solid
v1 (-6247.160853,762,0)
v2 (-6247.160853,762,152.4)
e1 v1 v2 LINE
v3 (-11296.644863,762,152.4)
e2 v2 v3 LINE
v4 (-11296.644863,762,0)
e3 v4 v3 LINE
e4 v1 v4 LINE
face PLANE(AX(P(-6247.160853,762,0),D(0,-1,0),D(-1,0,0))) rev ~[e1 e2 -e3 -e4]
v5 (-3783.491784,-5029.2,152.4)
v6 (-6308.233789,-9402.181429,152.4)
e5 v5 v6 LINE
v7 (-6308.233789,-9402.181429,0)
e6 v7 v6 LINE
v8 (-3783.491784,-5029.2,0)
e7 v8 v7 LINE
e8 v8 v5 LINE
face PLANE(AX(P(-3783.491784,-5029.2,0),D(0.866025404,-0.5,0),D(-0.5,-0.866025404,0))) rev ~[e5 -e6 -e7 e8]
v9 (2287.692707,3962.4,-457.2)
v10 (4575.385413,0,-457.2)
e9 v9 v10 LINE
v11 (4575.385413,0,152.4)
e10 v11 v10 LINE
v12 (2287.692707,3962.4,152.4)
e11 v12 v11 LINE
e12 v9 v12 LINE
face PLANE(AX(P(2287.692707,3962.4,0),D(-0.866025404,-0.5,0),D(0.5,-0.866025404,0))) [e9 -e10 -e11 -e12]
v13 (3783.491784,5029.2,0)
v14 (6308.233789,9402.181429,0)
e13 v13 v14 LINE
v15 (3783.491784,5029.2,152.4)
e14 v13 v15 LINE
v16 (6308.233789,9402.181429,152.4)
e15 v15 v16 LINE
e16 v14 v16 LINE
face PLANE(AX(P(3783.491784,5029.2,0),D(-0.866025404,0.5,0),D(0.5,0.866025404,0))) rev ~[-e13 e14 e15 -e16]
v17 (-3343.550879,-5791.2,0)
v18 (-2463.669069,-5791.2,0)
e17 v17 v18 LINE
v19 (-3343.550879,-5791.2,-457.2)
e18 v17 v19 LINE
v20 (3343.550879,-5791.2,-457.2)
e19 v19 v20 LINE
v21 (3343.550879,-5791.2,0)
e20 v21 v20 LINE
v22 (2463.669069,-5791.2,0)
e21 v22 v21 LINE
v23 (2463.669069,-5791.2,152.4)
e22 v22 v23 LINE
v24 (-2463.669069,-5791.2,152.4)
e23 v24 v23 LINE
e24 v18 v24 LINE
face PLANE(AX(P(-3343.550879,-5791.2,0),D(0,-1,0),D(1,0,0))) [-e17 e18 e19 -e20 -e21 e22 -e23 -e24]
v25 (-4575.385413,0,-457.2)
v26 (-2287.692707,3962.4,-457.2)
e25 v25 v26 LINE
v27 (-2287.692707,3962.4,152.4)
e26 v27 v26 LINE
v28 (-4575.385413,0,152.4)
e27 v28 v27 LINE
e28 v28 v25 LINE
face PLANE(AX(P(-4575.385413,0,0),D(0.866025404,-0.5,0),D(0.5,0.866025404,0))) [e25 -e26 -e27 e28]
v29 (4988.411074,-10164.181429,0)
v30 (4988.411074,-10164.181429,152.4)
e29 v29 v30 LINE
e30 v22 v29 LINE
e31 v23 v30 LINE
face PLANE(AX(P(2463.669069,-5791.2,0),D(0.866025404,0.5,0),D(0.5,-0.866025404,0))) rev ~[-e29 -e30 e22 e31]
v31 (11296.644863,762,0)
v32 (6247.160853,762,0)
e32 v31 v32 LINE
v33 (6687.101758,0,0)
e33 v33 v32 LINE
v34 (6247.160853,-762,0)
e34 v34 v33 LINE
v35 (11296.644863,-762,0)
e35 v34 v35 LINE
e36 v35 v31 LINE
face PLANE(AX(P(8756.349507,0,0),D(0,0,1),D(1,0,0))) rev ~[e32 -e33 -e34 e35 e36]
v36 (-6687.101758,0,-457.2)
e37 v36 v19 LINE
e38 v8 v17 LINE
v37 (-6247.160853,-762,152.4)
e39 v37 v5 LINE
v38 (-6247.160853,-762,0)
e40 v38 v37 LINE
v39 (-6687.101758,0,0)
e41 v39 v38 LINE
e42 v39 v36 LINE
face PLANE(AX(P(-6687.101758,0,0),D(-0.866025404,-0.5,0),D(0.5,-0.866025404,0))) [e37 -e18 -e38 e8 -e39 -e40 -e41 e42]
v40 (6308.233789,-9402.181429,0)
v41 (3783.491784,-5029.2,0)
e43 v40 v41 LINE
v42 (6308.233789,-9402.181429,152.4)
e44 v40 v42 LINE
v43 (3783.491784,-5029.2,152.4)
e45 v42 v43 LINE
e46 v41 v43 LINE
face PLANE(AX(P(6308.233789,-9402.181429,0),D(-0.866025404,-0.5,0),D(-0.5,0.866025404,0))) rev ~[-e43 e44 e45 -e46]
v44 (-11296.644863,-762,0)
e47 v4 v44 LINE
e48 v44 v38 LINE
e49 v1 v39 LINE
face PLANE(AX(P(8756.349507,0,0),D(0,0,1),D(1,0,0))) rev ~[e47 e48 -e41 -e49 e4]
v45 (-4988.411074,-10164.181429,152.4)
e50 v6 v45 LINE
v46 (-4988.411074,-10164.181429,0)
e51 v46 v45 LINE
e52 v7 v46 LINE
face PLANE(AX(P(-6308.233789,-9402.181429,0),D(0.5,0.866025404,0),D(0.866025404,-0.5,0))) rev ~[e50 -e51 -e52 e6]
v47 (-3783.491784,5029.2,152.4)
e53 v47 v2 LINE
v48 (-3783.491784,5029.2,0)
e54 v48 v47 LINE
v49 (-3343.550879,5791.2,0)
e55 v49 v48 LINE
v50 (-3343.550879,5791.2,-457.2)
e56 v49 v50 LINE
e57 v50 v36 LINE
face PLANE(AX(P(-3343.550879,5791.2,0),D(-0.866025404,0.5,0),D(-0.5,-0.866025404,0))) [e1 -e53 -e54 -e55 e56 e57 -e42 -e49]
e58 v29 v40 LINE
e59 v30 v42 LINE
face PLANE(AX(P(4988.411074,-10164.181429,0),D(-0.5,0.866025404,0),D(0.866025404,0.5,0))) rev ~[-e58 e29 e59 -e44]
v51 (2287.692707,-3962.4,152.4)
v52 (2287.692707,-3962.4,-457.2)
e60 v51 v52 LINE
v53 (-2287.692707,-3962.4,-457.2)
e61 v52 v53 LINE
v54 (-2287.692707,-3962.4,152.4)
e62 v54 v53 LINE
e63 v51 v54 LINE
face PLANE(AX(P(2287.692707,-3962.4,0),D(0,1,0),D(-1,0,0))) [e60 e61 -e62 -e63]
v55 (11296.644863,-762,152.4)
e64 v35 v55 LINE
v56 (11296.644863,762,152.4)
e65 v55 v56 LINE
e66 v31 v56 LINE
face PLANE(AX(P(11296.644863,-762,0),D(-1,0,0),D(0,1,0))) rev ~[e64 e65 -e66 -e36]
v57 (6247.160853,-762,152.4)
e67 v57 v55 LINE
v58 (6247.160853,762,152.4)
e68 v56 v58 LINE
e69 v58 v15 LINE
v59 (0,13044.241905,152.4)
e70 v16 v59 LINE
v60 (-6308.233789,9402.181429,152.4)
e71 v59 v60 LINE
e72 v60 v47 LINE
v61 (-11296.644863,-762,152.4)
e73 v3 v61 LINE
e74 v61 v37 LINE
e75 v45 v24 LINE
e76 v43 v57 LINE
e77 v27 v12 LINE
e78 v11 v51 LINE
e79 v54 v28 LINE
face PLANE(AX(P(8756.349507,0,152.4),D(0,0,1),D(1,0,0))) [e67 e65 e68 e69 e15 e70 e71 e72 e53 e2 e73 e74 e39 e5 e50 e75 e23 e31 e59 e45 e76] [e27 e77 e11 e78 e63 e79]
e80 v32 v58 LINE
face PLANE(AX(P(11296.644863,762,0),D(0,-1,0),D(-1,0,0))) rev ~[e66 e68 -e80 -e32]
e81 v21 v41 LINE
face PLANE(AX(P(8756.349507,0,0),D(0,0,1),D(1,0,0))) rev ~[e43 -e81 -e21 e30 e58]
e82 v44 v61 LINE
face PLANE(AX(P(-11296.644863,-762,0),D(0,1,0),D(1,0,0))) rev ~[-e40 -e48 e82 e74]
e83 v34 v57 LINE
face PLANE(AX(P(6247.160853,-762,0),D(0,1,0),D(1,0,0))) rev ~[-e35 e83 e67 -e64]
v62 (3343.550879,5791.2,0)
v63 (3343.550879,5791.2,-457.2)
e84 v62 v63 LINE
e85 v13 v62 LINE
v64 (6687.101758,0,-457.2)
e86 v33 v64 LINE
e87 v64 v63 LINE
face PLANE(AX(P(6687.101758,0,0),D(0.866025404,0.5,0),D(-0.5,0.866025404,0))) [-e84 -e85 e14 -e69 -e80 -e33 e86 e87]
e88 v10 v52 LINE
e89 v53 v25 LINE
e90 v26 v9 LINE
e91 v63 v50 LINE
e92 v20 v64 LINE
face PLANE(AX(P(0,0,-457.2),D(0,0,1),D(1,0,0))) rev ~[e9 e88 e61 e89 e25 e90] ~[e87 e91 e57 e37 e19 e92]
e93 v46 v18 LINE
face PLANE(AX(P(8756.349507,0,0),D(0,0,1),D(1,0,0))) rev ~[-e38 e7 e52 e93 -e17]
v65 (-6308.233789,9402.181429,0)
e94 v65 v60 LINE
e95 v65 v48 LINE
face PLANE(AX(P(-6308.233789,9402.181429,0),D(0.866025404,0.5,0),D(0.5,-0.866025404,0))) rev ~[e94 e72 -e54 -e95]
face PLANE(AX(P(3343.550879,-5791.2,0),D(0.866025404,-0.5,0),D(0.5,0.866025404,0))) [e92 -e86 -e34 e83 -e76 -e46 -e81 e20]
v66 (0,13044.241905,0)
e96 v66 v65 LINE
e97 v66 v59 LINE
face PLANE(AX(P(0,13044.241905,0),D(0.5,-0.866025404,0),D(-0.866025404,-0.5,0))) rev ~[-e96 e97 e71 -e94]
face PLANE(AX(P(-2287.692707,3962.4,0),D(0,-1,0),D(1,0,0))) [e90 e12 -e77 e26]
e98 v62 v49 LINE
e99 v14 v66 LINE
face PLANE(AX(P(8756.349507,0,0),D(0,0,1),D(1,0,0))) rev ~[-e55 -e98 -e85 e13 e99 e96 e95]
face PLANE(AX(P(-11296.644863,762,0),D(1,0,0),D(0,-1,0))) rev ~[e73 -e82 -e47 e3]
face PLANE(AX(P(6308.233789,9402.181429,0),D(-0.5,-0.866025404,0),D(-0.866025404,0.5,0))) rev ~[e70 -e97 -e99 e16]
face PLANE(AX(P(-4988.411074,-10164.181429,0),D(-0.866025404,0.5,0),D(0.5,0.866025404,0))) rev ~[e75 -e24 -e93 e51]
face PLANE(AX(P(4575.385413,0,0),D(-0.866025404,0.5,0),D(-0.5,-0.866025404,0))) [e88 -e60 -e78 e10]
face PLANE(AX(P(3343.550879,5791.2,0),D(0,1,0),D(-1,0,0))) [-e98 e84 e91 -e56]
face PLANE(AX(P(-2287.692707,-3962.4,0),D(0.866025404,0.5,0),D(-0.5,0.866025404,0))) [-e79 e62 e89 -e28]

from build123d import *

# Parameters (mm, degrees)
F1_DEPTH = 152.4
F2_DEPTH = 457.2


# Not quite as in the source:
# - the program builds the solid bodies; features that only make, move or delete a surface that nothing else refers to are left out


with BuildPart() as f1:
    # F0 (on Top) → F1 (new body)
    with BuildSketch(Plane.XY):
        Polygon((6247.1608527394, 762), (6687.1017578619, 0), (6247.1608527394, -762), (11296.6448630235, -762), (11296.6448630235, 762), align=None)
        Polygon((6247.1608527394, -762), (6687.1017578619, 0), (6247.1608527394, 762), (3783.4917840535, 5029.2), (3343.550878931, 5791.2), (2463.669068686, 5791.2), (-2463.669068686, 5791.2), (-3343.550878931, 5791.2), (-3783.4917840535, 5029.2), (-6247.1608527394, 762), (-6687.1017578619, 0), (-6247.1608527394, -762), (-3783.4917840535, -5029.2), (-3343.550878931, -5791.2), (-2463.669068686, -5791.2), (2463.669068686, -5791.2), (3343.550878931, -5791.2), (3783.4917840535, -5029.2), align=None)
        Polygon((2287.692706637, 3962.4), (4575.3854132739, 0), (2287.692706637, -3962.4), (-2287.692706637, -3962.4), (-4575.3854132739, 0), (-2287.692706637, 3962.4), align=None, mode=Mode.SUBTRACT)
        Polygon((6308.2337891955, -9402.1814289093), (3783.4917840535, -5029.2), (3343.550878931, -5791.2), (2463.669068686, -5791.2), (4988.411073828, -10164.1814289093), align=None)
        Polygon((3343.550878931, 5791.2), (3783.4917840535, 5029.2), (6308.2337891955, 9402.1814289093), (4988.411073828, 10164.1814289093), (2463.669068686, 5791.2), align=None)
        Polygon((-2463.669068686, 5791.2), (2463.669068686, 5791.2), (4988.411073828, 10164.1814289093), (0, 13044.2419052124), (-4988.411073828, 10164.1814289093), align=None)
        Polygon((-4988.411073828, -10164.1814289093), (-2463.669068686, -5791.2), (-3343.550878931, -5791.2), (-3783.4917840535, -5029.2), (-6308.2337891955, -9402.1814289093), align=None)
        Polygon((-3343.550878931, 5791.2), (-2463.669068686, 5791.2), (-4988.411073828, 10164.1814289093), (-6308.2337891955, 9402.1814289093), (-3783.4917840535, 5029.2), align=None)
        Polygon((-11296.6448630235, -762), (-6247.1608527394, -762), (-6687.1017578619, 0), (-6247.1608527394, 762), (-11296.6448630235, 762), align=None)
    extrude(amount=F1_DEPTH)

    # F0 (on Top) → F2 (join)
    with BuildSketch(Plane.XY):
        Polygon((6247.1608527394, -762), (6687.1017578619, 0), (6247.1608527394, 762), (3783.4917840535, 5029.2), (3343.550878931, 5791.2), (2463.669068686, 5791.2), (-2463.669068686, 5791.2), (-3343.550878931, 5791.2), (-3783.4917840535, 5029.2), (-6247.1608527394, 762), (-6687.1017578619, 0), (-6247.1608527394, -762), (-3783.4917840535, -5029.2), (-3343.550878931, -5791.2), (-2463.669068686, -5791.2), (2463.669068686, -5791.2), (3343.550878931, -5791.2), (3783.4917840535, -5029.2), align=None)
        Polygon((2287.692706637, 3962.4), (4575.3854132739, 0), (2287.692706637, -3962.4), (-2287.692706637, -3962.4), (-4575.3854132739, 0), (-2287.692706637, 3962.4), align=None, mode=Mode.SUBTRACT)
    extrude(amount=-F2_DEPTH)


solid = f1.part
